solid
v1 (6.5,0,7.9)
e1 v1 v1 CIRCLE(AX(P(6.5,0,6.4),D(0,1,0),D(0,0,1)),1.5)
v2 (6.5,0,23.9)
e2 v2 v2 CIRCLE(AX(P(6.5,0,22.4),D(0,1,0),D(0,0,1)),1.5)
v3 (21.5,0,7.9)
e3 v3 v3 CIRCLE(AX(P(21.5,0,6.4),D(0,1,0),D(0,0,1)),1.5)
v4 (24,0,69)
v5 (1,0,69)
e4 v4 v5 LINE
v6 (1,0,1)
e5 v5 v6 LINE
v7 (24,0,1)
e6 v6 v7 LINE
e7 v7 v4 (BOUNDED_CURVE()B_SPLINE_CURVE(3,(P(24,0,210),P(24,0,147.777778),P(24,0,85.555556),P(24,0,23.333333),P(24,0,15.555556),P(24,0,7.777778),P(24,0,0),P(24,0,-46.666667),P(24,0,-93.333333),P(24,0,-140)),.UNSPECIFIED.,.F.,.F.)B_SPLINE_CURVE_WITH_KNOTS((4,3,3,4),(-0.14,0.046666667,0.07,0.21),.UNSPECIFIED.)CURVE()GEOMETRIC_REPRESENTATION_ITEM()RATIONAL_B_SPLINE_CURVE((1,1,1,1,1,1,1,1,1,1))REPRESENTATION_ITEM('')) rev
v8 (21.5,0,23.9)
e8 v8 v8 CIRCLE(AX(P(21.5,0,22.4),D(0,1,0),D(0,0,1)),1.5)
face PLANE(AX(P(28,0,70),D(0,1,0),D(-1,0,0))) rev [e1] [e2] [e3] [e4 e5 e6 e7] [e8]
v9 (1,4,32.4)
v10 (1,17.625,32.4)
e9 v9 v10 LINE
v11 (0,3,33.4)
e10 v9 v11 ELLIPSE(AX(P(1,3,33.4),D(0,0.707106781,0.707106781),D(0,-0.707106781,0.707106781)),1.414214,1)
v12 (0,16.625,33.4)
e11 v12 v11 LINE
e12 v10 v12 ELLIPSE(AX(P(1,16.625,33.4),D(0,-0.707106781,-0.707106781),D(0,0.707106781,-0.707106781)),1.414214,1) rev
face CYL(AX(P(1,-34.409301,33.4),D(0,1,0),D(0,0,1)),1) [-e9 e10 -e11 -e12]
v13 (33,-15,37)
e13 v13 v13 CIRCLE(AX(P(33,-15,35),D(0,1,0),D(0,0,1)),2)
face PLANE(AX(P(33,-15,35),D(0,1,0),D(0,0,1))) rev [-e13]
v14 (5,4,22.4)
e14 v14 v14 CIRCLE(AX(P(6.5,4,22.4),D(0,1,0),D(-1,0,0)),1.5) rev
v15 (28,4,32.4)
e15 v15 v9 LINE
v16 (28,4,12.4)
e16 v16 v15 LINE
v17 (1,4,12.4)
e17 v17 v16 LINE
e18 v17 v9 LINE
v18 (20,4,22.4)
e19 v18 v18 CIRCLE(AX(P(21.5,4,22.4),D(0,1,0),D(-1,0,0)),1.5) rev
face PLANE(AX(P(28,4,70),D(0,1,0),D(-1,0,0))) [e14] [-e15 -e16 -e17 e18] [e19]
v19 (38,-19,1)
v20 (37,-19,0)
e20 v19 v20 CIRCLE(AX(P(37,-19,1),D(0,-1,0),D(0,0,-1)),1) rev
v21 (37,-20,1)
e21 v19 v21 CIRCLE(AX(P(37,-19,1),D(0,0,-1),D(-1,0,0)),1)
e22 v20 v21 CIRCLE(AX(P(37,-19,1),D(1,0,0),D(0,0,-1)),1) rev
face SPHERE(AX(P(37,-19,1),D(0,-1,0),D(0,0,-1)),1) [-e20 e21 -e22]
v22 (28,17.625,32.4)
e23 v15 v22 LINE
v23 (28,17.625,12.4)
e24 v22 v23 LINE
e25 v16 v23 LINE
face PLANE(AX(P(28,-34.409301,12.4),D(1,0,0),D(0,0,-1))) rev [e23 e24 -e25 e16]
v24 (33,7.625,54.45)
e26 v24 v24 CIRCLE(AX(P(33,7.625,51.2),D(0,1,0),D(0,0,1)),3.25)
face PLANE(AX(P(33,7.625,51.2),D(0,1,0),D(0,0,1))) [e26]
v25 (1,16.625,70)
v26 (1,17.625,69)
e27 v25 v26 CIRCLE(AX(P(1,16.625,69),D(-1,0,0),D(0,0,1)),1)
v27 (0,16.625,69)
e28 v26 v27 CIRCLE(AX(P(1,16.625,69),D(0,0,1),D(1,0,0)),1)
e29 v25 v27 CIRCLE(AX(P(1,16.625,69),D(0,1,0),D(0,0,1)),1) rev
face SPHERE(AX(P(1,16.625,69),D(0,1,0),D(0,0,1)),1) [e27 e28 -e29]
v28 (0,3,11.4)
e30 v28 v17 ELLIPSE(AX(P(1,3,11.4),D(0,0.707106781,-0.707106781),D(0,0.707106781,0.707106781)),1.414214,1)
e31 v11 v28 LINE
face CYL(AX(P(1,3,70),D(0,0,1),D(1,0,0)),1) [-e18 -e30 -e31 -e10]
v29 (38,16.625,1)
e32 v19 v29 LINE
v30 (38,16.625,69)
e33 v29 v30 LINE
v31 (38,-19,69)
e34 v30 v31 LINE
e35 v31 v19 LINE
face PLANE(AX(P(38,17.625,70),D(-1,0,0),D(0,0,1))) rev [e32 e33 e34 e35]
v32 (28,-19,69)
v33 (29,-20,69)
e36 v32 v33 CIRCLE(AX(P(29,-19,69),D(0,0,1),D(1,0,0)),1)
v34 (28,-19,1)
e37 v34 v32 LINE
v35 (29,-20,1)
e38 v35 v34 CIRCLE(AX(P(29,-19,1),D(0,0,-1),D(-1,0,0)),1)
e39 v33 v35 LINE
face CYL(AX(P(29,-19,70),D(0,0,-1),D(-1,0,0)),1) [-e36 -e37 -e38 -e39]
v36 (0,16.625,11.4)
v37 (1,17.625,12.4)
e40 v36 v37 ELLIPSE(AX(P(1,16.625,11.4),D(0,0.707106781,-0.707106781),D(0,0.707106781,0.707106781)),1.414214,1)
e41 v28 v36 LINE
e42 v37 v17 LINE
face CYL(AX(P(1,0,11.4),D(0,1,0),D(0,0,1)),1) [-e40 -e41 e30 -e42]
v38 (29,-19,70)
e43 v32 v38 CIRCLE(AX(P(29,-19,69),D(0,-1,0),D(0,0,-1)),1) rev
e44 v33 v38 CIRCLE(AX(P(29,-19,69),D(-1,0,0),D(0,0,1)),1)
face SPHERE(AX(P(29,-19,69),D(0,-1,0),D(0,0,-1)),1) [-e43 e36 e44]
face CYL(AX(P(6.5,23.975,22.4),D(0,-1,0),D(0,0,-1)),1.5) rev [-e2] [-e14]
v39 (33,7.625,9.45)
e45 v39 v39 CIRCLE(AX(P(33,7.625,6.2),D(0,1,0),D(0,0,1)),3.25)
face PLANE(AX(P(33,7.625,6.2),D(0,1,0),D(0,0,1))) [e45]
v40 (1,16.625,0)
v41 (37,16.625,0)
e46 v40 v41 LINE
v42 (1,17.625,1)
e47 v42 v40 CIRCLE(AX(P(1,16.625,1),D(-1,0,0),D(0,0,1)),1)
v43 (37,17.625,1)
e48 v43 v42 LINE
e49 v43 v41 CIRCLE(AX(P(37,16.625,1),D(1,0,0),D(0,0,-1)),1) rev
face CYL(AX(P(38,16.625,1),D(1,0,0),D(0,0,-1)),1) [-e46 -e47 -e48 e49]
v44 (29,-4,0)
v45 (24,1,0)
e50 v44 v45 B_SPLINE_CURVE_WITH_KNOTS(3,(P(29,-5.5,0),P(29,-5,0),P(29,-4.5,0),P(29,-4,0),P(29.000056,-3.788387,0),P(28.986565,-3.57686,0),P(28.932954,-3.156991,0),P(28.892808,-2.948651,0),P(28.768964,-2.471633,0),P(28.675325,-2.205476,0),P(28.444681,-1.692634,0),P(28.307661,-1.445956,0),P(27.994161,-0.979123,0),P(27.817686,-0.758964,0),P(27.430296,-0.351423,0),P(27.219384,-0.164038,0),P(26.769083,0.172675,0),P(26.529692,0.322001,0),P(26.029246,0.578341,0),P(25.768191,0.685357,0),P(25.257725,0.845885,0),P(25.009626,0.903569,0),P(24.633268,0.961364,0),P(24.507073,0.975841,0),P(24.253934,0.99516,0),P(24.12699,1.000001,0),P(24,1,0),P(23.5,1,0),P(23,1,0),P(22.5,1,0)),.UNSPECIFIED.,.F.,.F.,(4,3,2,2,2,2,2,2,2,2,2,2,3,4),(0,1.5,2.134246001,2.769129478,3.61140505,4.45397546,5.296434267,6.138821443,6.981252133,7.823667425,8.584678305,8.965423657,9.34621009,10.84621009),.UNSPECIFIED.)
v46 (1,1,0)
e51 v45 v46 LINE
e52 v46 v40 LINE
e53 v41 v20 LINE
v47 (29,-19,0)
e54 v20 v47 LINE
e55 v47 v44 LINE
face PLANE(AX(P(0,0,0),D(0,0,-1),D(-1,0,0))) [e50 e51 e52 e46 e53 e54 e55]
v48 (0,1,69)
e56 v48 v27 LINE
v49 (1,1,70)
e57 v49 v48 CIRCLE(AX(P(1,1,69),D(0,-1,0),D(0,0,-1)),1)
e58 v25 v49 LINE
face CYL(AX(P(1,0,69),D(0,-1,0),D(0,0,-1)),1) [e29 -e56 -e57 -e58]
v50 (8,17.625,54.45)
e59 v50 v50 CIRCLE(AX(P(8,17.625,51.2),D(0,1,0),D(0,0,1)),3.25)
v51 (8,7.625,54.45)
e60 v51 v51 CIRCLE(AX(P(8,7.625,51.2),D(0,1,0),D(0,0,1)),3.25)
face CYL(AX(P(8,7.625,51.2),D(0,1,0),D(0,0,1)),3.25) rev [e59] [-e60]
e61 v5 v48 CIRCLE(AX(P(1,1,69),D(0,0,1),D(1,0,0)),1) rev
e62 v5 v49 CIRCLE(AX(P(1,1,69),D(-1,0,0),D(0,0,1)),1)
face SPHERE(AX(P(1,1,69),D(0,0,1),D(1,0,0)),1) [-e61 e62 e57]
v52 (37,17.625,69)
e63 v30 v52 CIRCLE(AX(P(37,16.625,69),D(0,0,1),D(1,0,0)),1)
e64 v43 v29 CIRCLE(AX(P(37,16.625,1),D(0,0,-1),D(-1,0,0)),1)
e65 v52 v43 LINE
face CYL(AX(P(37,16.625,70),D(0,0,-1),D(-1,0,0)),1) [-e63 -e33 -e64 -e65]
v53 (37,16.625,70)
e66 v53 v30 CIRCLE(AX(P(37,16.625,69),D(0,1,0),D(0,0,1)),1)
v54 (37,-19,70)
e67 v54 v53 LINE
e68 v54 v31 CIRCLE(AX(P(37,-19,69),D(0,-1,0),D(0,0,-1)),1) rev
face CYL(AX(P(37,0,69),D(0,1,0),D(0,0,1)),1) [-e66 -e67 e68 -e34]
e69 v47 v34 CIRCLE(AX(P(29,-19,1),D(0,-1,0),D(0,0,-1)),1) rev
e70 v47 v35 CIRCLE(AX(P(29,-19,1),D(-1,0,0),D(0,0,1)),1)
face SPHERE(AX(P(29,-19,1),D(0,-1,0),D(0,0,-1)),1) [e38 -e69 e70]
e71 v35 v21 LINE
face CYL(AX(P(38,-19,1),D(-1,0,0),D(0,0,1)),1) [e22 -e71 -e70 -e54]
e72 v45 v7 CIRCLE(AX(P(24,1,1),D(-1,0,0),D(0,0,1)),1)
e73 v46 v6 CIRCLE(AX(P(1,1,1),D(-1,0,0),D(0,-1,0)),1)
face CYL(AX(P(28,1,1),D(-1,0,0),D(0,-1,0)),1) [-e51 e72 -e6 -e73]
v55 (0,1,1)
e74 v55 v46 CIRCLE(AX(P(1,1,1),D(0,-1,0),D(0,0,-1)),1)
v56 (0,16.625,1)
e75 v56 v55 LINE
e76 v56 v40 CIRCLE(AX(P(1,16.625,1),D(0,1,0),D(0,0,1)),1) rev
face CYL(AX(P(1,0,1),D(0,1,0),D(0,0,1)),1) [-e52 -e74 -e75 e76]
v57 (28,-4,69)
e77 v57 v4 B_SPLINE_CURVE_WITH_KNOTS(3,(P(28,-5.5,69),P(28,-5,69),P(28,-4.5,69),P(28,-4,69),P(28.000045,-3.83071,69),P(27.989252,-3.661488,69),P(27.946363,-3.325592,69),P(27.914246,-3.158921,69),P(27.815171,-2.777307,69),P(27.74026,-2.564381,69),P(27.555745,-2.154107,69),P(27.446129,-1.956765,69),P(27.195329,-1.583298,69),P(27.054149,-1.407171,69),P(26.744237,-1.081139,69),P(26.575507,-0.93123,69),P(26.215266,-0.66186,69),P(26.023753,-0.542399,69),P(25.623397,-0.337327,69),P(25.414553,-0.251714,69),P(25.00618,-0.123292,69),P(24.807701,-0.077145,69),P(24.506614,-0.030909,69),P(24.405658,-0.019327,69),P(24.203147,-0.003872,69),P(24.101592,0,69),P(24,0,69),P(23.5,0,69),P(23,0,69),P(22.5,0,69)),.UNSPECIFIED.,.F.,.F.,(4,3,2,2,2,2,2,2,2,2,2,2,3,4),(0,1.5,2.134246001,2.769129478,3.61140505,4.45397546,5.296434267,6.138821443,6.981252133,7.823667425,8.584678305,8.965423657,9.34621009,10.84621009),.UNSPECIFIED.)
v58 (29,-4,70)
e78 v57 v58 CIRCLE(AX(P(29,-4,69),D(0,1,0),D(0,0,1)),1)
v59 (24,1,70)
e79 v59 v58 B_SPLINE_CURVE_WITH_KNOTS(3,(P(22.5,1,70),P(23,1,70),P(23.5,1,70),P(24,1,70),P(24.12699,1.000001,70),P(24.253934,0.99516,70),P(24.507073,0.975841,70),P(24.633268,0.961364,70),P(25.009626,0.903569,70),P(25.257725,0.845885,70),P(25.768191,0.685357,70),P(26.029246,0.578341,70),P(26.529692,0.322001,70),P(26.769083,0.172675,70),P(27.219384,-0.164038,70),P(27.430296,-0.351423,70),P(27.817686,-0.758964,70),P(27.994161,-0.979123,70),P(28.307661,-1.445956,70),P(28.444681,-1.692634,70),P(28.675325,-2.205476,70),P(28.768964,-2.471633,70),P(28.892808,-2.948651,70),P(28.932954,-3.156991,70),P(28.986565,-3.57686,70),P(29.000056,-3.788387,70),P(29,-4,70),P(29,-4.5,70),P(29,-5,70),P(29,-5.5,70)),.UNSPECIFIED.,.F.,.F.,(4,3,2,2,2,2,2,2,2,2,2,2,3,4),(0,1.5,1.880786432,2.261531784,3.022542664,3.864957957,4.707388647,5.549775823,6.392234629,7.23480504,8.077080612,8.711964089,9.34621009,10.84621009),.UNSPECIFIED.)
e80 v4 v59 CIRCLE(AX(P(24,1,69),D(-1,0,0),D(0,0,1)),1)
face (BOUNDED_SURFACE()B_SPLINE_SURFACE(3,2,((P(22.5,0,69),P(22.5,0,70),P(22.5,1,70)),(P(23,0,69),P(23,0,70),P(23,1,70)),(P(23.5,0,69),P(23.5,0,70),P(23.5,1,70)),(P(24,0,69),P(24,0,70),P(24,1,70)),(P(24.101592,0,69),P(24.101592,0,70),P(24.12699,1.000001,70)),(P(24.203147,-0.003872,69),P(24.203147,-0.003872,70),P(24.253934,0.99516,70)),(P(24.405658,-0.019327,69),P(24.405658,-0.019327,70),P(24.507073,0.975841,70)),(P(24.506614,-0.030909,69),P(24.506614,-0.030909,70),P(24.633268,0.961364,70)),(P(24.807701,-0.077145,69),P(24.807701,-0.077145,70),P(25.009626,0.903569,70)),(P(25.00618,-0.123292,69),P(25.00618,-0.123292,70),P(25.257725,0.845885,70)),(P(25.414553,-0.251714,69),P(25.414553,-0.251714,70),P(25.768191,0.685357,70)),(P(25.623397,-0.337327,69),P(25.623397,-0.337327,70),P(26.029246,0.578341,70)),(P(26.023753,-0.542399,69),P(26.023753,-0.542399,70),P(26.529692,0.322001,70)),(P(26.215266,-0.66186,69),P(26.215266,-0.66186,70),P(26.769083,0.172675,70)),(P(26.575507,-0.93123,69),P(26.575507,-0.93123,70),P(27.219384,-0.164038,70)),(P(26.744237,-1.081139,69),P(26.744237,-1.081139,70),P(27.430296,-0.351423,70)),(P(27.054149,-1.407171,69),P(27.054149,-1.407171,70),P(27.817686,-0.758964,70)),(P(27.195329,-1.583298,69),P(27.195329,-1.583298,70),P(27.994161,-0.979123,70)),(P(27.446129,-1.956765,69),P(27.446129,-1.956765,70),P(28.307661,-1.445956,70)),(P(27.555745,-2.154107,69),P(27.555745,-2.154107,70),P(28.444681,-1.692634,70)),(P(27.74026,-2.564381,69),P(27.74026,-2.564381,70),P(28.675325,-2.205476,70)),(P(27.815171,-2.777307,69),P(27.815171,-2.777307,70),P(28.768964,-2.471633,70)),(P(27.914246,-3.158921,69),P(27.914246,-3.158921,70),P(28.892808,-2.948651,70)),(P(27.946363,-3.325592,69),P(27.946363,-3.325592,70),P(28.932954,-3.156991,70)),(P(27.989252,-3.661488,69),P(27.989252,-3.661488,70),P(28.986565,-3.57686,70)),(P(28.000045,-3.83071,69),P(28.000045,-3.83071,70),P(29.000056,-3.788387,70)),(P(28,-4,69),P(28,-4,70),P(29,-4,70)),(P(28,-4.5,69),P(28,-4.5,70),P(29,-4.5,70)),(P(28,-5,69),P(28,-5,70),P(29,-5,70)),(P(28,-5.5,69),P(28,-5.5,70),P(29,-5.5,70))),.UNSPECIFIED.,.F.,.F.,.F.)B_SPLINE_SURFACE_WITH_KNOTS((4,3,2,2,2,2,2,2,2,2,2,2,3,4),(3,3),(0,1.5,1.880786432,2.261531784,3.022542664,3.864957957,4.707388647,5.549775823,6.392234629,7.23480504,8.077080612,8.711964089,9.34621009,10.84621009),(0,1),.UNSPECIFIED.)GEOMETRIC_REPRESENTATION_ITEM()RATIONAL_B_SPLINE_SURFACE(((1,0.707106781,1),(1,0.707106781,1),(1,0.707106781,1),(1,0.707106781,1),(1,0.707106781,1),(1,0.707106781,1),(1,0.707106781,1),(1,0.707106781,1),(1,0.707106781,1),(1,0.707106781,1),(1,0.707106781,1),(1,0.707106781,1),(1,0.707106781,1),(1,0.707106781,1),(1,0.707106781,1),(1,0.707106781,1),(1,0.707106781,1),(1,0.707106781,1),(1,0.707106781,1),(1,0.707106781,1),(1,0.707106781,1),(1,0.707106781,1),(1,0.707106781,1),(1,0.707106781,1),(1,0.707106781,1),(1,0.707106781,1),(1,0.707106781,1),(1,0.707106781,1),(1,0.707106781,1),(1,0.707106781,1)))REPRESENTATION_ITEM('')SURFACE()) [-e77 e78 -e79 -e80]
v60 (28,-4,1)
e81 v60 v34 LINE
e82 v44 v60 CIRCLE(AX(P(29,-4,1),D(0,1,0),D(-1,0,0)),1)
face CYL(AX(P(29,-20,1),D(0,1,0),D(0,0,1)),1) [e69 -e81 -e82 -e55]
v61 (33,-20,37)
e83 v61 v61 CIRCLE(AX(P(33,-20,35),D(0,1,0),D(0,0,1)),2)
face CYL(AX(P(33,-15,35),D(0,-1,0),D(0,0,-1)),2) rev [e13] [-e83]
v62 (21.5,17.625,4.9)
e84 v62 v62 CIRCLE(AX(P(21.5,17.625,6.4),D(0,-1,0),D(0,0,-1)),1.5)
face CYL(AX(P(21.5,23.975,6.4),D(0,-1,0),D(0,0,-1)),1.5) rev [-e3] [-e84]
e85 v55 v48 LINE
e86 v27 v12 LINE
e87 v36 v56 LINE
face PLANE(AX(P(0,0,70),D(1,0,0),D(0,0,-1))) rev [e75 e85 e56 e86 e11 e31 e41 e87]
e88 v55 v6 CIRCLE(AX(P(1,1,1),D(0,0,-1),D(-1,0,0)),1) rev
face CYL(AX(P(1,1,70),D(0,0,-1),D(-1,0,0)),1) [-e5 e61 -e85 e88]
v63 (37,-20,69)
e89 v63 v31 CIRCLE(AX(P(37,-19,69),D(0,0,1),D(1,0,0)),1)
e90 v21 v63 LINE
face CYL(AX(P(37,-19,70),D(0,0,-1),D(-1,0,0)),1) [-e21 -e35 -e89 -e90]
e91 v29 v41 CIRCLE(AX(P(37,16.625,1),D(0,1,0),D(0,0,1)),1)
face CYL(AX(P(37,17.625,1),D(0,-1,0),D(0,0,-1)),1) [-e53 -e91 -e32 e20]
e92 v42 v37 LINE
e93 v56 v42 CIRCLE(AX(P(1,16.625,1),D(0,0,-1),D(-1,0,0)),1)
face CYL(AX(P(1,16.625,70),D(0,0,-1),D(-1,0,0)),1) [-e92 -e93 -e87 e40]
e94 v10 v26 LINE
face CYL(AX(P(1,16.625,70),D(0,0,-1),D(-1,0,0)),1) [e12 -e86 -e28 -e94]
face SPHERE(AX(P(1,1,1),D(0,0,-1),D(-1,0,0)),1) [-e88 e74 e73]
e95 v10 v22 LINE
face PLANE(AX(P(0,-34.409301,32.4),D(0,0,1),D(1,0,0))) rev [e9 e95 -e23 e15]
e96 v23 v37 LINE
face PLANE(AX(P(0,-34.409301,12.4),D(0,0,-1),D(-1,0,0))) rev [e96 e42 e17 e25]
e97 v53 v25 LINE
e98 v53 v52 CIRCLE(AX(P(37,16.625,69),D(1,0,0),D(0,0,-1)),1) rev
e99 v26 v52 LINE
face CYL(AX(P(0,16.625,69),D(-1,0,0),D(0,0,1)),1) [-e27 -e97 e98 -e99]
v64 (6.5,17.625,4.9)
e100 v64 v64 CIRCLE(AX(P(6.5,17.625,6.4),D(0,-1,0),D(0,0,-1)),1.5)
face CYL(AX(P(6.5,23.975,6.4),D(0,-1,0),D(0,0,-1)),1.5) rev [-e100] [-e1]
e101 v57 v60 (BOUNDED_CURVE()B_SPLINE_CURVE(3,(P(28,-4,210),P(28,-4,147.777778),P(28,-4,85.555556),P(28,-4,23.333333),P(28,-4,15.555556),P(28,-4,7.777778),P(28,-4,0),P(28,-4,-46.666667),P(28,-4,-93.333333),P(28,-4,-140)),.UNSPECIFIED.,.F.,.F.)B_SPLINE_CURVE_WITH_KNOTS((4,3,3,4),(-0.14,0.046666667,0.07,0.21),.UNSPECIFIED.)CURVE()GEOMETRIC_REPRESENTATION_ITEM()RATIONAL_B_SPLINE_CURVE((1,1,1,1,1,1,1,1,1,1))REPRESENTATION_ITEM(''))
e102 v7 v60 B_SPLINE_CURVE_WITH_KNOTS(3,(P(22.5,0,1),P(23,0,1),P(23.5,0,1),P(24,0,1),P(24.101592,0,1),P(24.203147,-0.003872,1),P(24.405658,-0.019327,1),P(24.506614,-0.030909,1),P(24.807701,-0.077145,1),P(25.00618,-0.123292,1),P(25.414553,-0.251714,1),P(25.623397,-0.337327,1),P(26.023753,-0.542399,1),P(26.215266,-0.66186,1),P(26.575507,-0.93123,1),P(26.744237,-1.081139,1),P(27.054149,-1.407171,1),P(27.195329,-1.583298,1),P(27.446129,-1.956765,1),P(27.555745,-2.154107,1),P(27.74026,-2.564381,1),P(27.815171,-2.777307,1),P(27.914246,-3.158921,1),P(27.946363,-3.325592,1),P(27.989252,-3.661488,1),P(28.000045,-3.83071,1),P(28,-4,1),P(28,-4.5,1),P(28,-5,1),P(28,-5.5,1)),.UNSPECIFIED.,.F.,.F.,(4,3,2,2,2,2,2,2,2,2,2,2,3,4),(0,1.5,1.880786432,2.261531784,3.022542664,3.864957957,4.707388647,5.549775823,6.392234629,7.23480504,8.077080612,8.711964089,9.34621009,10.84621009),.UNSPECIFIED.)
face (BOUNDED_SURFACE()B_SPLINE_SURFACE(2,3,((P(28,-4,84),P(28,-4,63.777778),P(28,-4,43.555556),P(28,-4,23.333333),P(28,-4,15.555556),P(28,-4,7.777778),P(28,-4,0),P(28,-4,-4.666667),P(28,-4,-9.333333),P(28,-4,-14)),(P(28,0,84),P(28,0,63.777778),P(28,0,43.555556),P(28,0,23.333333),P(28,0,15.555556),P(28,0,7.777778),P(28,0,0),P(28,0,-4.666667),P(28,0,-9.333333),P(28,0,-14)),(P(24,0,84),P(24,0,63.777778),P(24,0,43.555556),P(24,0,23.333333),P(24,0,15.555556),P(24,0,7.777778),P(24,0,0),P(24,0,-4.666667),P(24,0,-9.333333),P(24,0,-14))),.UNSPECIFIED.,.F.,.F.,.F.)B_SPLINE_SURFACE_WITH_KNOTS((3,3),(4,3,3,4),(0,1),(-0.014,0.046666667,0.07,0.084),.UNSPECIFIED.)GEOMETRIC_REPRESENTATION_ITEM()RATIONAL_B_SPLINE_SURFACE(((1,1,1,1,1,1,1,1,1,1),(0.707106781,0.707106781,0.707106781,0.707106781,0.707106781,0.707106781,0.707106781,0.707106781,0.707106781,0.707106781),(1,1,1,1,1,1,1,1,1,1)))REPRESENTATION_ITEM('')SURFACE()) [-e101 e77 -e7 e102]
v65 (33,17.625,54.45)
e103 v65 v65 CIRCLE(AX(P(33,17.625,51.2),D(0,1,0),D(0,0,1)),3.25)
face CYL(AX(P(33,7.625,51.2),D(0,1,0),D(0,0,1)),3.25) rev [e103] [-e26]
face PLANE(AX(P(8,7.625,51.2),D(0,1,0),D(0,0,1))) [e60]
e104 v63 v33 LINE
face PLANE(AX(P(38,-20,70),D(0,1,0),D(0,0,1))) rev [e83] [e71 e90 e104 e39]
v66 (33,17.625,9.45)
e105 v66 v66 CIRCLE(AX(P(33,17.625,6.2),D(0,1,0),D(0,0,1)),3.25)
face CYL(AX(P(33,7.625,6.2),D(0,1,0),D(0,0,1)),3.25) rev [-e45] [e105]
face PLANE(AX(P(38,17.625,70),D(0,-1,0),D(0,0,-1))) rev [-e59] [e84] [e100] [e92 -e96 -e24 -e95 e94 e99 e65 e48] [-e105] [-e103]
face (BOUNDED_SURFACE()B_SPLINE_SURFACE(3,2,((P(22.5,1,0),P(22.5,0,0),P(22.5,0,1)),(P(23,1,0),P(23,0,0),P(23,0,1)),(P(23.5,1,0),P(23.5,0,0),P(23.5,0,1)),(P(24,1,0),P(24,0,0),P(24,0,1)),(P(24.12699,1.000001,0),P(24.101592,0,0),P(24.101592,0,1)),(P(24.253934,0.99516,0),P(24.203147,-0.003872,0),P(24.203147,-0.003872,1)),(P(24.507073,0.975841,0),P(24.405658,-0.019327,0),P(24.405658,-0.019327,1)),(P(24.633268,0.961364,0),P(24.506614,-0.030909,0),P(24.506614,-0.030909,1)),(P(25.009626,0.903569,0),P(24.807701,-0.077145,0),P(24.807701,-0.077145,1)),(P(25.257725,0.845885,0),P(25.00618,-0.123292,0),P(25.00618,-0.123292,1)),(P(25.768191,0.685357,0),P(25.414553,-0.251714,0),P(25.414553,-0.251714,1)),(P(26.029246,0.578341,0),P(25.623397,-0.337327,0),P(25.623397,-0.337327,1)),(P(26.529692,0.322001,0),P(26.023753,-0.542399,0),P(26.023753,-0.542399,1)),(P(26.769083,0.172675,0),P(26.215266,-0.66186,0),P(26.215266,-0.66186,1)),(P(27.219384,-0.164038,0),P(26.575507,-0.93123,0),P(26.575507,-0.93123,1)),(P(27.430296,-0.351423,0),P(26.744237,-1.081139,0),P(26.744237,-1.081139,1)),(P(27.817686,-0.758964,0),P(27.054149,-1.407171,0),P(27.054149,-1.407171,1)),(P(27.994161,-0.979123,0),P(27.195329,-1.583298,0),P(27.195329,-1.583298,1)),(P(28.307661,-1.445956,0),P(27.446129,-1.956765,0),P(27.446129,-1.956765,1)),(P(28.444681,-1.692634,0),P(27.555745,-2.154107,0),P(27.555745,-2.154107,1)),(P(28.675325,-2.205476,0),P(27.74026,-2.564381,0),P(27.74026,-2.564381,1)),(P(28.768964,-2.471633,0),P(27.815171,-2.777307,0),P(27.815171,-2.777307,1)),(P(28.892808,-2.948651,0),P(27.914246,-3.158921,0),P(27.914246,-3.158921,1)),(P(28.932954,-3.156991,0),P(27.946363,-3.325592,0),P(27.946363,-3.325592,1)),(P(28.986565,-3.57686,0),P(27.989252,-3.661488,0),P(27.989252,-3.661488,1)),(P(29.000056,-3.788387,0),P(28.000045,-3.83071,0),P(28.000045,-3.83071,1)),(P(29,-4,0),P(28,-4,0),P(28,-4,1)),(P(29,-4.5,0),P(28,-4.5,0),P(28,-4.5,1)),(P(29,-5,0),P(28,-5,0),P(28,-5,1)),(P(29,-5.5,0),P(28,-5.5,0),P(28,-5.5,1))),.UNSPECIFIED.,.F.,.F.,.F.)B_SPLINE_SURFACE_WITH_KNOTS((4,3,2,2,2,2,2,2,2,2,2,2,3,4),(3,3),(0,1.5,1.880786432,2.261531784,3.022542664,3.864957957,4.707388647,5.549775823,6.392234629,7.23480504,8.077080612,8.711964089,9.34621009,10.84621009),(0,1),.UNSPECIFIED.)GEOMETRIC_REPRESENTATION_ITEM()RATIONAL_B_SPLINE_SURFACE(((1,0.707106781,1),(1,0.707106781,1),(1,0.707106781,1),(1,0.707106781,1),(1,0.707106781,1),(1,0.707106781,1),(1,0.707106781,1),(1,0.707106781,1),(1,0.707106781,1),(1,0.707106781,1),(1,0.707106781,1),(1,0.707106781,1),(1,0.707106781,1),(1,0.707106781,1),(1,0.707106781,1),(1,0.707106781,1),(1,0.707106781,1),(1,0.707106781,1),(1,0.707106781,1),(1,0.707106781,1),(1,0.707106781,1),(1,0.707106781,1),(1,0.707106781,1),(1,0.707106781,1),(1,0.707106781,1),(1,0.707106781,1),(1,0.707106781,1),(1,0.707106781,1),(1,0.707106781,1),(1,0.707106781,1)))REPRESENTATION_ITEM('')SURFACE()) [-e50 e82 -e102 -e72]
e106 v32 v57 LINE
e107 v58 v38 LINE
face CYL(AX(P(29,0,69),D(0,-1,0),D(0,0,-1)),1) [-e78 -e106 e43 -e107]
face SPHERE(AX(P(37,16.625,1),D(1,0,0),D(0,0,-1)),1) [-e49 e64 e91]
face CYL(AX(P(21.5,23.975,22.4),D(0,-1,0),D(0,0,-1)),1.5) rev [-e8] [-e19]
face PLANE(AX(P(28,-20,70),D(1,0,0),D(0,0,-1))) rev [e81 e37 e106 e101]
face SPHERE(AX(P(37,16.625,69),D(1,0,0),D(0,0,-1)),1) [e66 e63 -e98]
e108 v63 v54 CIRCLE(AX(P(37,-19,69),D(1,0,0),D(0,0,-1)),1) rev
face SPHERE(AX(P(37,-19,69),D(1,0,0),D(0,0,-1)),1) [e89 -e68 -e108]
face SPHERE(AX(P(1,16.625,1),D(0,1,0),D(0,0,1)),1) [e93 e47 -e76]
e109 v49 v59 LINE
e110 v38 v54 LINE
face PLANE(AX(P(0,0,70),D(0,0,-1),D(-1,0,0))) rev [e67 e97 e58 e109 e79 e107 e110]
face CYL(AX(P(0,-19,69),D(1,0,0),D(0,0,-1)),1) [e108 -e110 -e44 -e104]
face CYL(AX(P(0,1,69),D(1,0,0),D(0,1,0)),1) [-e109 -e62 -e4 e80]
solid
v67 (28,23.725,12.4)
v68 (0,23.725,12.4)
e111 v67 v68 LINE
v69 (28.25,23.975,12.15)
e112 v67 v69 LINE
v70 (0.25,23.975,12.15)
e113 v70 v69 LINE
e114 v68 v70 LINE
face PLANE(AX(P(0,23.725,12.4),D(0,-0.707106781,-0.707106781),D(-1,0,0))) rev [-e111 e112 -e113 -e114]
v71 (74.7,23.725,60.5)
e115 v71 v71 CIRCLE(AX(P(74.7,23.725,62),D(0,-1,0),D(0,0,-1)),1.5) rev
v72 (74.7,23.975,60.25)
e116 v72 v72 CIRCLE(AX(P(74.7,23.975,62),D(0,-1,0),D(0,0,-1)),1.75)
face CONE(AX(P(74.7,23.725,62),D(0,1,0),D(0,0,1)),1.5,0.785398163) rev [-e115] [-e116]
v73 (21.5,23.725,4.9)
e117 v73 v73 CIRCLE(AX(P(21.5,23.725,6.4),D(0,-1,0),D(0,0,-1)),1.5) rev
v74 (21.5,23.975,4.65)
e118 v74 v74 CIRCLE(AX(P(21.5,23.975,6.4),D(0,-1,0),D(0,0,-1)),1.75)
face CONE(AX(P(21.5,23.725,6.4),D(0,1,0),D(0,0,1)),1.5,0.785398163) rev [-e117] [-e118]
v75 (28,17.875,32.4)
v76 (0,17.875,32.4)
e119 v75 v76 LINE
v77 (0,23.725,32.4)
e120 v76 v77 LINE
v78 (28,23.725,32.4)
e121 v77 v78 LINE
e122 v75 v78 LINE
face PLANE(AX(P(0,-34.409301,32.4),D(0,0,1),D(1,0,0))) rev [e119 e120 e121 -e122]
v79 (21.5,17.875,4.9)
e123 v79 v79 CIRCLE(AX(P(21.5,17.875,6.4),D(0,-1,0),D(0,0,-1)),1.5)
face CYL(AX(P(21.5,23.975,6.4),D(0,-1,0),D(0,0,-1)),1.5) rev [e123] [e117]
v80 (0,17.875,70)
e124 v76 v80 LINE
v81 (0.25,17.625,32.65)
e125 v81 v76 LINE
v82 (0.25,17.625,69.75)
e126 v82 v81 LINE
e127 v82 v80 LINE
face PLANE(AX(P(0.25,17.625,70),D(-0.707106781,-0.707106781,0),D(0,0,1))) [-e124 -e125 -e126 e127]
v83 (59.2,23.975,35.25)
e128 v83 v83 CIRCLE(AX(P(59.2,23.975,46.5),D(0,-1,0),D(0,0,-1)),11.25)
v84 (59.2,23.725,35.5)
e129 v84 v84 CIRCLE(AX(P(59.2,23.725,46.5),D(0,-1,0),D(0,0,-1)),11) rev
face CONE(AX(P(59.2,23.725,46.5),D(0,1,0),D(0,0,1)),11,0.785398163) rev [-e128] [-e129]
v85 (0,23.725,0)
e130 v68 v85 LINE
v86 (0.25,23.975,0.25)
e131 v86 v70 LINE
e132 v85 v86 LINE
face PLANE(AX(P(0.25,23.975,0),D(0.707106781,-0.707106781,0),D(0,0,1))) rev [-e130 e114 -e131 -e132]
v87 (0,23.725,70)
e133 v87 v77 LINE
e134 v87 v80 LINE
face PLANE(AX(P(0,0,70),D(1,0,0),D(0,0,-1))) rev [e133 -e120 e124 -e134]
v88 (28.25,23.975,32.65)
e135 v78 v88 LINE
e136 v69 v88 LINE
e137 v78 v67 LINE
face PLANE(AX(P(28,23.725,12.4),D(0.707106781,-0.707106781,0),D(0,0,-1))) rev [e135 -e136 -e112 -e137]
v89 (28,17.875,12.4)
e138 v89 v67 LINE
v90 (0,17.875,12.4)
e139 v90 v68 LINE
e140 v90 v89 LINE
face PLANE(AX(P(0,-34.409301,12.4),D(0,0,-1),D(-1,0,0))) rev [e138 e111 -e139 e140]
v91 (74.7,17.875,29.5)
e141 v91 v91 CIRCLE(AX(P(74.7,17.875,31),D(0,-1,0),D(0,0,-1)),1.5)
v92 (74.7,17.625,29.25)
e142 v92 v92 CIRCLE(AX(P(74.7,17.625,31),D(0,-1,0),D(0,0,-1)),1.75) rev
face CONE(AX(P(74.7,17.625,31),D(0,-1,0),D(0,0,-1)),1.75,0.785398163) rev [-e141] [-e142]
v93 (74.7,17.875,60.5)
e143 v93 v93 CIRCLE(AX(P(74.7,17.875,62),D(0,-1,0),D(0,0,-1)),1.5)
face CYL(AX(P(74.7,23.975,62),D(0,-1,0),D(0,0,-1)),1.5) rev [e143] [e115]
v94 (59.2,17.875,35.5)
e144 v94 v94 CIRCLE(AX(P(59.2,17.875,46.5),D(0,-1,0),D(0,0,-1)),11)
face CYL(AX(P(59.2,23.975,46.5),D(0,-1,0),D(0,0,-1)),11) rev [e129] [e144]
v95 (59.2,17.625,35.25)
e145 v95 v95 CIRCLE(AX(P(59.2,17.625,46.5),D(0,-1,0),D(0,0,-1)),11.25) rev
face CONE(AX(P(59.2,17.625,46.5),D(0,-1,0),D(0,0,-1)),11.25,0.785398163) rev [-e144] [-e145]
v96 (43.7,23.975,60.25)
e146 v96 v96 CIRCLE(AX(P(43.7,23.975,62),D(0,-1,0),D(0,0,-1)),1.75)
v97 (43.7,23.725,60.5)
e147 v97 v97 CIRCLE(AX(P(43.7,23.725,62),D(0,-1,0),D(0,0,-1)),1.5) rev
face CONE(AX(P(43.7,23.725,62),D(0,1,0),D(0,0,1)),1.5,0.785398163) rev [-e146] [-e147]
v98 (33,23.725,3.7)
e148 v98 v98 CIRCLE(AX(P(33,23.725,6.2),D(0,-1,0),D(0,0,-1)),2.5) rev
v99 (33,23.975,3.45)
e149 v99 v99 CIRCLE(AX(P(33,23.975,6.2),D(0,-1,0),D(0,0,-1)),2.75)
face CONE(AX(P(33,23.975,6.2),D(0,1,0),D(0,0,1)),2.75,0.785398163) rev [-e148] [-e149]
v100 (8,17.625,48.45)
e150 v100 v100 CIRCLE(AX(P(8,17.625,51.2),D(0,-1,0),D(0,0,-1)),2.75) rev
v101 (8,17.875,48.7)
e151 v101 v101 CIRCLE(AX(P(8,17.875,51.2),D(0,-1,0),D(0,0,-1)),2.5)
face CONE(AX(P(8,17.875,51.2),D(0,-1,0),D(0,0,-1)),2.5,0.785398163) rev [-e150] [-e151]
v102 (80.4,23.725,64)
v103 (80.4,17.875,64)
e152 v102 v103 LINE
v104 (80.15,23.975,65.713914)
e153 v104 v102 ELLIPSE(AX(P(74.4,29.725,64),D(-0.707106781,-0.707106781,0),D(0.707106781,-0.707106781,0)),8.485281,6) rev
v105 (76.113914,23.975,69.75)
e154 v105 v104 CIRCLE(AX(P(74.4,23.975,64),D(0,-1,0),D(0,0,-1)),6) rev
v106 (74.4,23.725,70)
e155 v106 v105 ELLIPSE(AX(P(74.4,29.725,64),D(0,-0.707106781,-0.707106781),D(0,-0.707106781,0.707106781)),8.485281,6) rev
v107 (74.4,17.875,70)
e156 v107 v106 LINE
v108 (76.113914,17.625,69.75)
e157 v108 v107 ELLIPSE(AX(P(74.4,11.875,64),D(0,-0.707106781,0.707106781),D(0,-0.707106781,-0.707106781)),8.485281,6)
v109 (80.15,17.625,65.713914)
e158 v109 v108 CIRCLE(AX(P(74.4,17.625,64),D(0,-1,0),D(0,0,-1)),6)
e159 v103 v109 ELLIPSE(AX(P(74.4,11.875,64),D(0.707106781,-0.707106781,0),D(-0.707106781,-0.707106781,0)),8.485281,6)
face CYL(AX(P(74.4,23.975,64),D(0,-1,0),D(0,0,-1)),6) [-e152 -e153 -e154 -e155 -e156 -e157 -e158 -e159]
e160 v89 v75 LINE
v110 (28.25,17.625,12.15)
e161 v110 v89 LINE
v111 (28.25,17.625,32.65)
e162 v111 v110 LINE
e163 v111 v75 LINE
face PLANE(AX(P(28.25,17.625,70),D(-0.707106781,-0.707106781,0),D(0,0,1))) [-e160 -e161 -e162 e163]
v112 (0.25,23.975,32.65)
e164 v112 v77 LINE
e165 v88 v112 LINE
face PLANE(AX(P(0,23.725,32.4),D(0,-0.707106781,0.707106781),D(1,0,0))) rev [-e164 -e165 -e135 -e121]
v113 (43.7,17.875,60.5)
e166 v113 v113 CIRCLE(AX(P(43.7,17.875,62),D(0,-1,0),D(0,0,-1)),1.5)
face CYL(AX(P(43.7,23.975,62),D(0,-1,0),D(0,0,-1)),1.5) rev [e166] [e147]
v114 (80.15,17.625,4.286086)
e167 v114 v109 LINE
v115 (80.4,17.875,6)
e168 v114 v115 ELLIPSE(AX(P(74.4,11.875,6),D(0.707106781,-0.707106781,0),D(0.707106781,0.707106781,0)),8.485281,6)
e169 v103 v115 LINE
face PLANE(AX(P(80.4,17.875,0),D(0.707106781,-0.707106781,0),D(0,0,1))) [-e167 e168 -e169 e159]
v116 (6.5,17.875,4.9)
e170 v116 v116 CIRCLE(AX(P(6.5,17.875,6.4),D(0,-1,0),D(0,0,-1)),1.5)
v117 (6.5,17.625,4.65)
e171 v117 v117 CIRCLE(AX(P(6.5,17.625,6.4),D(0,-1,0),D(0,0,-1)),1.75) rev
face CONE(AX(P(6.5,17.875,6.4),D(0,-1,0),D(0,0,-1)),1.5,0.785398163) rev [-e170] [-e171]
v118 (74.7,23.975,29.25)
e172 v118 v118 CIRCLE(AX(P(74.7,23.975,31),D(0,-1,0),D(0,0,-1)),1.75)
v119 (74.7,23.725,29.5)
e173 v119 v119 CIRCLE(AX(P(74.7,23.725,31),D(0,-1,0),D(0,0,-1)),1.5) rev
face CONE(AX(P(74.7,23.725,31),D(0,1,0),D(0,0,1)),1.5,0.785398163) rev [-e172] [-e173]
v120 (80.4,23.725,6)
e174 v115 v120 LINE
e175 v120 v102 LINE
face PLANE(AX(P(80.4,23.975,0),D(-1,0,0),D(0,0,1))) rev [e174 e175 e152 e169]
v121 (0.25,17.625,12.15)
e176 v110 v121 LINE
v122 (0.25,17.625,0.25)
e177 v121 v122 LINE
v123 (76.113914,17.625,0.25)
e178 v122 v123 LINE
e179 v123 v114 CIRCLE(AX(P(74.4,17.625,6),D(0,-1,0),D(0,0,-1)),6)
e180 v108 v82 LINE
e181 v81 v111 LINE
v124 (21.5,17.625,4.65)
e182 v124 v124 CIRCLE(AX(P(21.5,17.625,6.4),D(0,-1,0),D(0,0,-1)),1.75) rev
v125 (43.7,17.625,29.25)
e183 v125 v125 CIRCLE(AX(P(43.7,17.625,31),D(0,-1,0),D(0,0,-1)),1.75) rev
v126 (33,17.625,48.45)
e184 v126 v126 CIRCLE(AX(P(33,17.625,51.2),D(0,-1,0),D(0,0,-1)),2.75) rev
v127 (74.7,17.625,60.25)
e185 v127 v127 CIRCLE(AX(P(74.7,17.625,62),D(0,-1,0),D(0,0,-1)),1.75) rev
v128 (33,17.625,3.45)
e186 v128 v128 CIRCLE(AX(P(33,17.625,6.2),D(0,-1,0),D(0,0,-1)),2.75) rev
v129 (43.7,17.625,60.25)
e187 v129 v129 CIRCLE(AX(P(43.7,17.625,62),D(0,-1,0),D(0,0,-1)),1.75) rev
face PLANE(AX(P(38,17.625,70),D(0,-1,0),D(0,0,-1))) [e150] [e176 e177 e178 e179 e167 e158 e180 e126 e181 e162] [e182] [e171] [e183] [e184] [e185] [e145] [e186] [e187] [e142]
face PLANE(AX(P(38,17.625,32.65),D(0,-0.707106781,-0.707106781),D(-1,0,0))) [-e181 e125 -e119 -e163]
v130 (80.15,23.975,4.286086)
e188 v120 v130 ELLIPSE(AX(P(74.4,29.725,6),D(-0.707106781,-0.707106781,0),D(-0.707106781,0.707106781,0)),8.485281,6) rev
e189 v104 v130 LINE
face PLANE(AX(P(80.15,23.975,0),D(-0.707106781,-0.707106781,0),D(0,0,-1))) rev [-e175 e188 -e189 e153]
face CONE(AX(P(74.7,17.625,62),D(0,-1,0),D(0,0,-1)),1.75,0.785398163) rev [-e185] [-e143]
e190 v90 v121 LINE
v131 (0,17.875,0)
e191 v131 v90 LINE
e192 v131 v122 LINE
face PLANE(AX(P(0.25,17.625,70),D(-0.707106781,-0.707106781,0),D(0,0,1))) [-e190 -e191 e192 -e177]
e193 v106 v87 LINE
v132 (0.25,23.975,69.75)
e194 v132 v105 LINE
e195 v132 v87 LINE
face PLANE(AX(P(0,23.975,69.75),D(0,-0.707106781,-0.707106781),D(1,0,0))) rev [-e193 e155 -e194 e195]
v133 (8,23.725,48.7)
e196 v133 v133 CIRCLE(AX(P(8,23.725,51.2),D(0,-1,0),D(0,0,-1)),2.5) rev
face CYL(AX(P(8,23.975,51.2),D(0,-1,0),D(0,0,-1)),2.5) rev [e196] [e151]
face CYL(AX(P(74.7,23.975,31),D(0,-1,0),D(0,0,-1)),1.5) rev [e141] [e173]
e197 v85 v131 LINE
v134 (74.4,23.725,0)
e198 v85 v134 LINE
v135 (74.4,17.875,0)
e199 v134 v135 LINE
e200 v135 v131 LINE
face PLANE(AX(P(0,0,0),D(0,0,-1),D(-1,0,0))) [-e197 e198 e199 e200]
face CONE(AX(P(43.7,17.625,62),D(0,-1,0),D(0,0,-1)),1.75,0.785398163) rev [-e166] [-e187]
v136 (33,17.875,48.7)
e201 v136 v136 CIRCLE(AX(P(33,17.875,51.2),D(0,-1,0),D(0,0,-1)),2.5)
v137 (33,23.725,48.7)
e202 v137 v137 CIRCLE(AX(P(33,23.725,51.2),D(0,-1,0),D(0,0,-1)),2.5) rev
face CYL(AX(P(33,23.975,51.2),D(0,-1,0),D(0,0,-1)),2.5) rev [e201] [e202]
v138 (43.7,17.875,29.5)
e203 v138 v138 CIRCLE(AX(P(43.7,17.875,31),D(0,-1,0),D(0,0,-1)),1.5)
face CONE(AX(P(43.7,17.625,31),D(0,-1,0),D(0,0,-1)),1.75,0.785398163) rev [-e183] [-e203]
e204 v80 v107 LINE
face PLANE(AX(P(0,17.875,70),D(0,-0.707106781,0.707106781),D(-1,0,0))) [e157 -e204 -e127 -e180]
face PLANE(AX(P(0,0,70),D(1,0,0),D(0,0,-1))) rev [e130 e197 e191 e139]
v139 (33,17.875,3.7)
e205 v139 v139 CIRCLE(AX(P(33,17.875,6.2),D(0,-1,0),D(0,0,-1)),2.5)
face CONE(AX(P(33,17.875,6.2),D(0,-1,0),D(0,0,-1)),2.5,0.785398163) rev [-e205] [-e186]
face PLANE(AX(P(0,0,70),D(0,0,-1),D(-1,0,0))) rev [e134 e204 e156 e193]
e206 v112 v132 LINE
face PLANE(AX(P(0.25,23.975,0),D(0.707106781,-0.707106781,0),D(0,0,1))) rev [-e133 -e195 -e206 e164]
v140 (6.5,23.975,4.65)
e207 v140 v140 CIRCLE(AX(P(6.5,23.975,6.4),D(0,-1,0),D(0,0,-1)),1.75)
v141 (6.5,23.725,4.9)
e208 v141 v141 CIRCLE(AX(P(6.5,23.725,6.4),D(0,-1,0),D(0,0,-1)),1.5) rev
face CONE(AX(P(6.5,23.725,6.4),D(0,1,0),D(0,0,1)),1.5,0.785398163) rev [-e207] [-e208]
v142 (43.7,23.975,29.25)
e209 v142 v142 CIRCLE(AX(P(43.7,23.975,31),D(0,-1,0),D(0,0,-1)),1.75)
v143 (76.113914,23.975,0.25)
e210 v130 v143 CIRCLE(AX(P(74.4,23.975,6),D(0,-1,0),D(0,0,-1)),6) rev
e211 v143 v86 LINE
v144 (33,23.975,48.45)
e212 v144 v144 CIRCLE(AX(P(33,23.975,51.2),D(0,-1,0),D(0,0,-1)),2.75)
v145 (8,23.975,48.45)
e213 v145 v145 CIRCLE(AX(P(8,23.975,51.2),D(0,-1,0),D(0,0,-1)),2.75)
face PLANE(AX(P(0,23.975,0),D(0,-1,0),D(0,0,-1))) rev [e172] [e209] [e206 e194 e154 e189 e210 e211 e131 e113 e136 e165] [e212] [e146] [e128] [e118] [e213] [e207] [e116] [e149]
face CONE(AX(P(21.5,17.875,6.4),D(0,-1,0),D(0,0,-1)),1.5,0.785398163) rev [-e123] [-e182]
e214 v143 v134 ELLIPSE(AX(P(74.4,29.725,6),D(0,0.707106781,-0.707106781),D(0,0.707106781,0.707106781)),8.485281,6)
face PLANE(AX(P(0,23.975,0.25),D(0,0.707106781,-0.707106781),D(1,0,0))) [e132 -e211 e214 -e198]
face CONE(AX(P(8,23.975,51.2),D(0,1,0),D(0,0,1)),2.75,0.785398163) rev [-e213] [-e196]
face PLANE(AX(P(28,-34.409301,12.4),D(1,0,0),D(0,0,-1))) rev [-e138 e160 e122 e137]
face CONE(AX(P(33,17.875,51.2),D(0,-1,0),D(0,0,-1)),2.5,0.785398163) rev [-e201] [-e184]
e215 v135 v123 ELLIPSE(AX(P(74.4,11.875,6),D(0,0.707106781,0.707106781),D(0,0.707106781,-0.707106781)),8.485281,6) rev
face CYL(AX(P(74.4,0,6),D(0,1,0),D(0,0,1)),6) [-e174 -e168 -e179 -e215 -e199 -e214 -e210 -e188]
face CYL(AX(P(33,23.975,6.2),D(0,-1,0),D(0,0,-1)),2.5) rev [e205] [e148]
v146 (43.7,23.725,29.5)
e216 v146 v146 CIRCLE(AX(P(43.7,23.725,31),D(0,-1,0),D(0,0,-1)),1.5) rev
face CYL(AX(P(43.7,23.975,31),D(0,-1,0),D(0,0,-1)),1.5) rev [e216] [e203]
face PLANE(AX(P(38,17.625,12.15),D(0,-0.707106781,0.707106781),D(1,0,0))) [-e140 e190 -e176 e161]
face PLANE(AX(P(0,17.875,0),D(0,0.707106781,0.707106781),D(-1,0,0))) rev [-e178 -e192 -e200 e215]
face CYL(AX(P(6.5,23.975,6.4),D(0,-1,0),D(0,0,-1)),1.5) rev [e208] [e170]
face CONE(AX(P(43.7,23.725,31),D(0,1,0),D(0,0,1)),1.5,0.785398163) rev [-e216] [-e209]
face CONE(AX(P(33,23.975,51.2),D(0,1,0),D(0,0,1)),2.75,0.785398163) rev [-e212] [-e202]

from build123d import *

# Parameters (mm, degrees)
BOSS_EXTRUDE1_DEPTH = 70
SKETCH4_R           = 1.5
SKETCH4_R_2         = 11
BOSS_EXTRUDE3_DEPTH = 6.35
SKETCH5_W           = 28
SKETCH5_H           = 20
CUT_EXTRUDE2_DEPTH  = 19.975
SKETCH2_R           = 1.5
CUT_EXTRUDE1_DEPTH  = 110.265550953
VARFILLET1_DEPTH    = 70
SKETCH7_R           = 3.25
CUT_EXTRUDE4_DEPTH  = 10
SKETCH8_R           = 2.5
CUT_EXTRUDE5_DEPTH  = 114.04778037
SKETCH18_R          = 2
CUT_EXTRUDE9_DEPTH  = 5
CHAMFER1_SIZE       = 0.25
FILLET1_R           = 1
FILLET2_R           = 6


with BuildPart() as part:
    # Sketch1 → Boss-Extrude1 (new body)
    with BuildSketch(Plane.XY):
        Polygon((0, 0), (0, 17.625), (38, 17.625), (38, -20), (28, -20), (28, 0), align=None)
    extrude(amount=BOSS_EXTRUDE1_DEPTH)

    # Sketch4 → Boss-Extrude3 (add)
    with BuildSketch(Plane(origin=(0, 17.625, 0), x_dir=(1, 0, 0), z_dir=(0, 1, 0))):
        Polygon((38, -70), (0, -70), (0, 0), (38, 0), (80.4, 0), (80.4, -70), align=None)
        with Locations(Location((43.7, -31, 0), (0, 0, 270))):
            Circle(SKETCH4_R, mode=Mode.SUBTRACT)
        with Locations(Location((43.7, -62, 0), (0, 0, 270))):
            Circle(SKETCH4_R, mode=Mode.SUBTRACT)
        with Locations(Location((74.7, -62, 0), (0, 0, 270))):
            Circle(SKETCH4_R, mode=Mode.SUBTRACT)
        with Locations(Location((74.7, -31, 0), (0, 0, 270))):
            Circle(SKETCH4_R, mode=Mode.SUBTRACT)
        with Locations(Location((59.2, -46.5, 0), (0, 0, 270))):
            Circle(SKETCH4_R_2, mode=Mode.SUBTRACT)
    extrude(amount=BOSS_EXTRUDE3_DEPTH)

    # Sketch5 → Cut-Extrude2 (cut)
    with BuildSketch(Plane(origin=(0, 23.975, 0), x_dir=(1, 0, 0), z_dir=(0, 1, 0))):
        with Locations((14, -22.4)):
            Rectangle(SKETCH5_W, SKETCH5_H)
    extrude(amount=-CUT_EXTRUDE2_DEPTH, mode=Mode.SUBTRACT)

    # Sketch2 → Cut-Extrude1 (cut, through all)
    with BuildSketch(Plane(origin=(0, 0, 0), x_dir=(1, 0, 0), z_dir=(0, 1, 0))):
        with Locations(Location((6.5, -6.4, 0), (0, 0, 270))):
            Circle(SKETCH2_R)
        with Locations(Location((6.5, -22.4, 0), (0, 0, 180))):
            Circle(SKETCH2_R)
        with Locations(Location((21.5, -22.4, 0), (0, 0, 180))):
            Circle(SKETCH2_R)
        with Locations(Location((21.5, -6.4, 0), (0, 0, 270))):
            Circle(SKETCH2_R)
    extrude(amount=CUT_EXTRUDE1_DEPTH, mode=Mode.SUBTRACT)

    # VarFillet1: read off the stored shape, not the designer's step
    # VarFillet1 outline → VarFillet1 (add)
    with BuildSketch(Plane.XY):
        with BuildLine():
            add(Edge.make_bspline(
                [(28, -4), (28, 0), (24, 0)],
                knots=[0, 0, 0, 1, 1, 1], degree=2, weights=[1, 0.707106781, 1]))
            Line((28, -4), (28, 0))
            Line((28, 0), (24, 0))
        make_face()
    extrude(amount=VARFILLET1_DEPTH)


with BuildPart() as body_2:
    # Split1: read off the stored shape, not the designer's step
    # Split1: the piece on the far side of the plane
    add(part.part)
    split(bisect_by=Plane(origin=(0, 17.625, 0), x_dir=(1, 0, 0), z_dir=(0, 1, 0)), keep=Keep.BOTTOM)

    # Sketch7 → Cut-Extrude4 (cut)
    with BuildSketch(Plane(origin=(0, 17.625, 0), x_dir=(1, 0, 0), z_dir=(0, 1, 0))):
        with Locations(Location((33, -6.2, 0), (0, 0, 270))):
            Circle(SKETCH7_R)
        with Locations(Location((33, -51.2, 0), (0, 0, 270))):
            Circle(SKETCH7_R)
        with Locations(Location((8, -51.2, 0), (0, 0, 270))):
            Circle(SKETCH7_R)
    extrude(amount=-CUT_EXTRUDE4_DEPTH, mode=Mode.SUBTRACT)

    # Sketch18 → Cut-Extrude9 (cut)
    with BuildSketch(Plane(origin=(52, -20, 0), x_dir=(0, 0, 1), z_dir=(0, 1, 0))):
        with Locations((35, -19)):
            Circle(SKETCH18_R)
    extrude(amount=CUT_EXTRUDE9_DEPTH, mode=Mode.SUBTRACT)

    # Fillet1
    fillet1_edges = [body_2.edges().sort_by_distance(p)[0] for p in [
        (0, 8.8125, 0),
        (0, 8.8125, 70),
        (19, 17.625, 70),
        (0, 17.625, 6.2),
        (0, 17.625, 51.2),
        (0, 0, 35),
        (38, -20, 35),
        (28, -20, 35),
        (19, 17.625, 0),
        (38, 17.625, 35),
        (33, -20, 70),
        (38, -1.1875, 70),
        (0, 10.8125, 32.4),
        (0, 10.8125, 12.4),
        (0, 4, 22.4),
        (12, 0, 70),
        (38, -1.1875, 0),
        (28, -12, 0),
        (28, -12, 70),
        (28, -4, 35),
        (24, 0, 35),
        (26.828426796, -1.171572546, 0),
        (33, -20, 0),
        (26.828426796, -1.171572546, 70),
        (12, 0, 0),
    ]]
    fillet(fillet1_edges, radius=FILLET1_R)


with BuildPart() as part_1:
    add(part.part)

    # Split1
    split(bisect_by=Plane(origin=(0, 17.625, 0), x_dir=(1, 0, 0), z_dir=(0, 1, 0)), keep=Keep.TOP)

    # Sketch8 → Cut-Extrude5 (cut, through all)
    with BuildSketch(Plane.XZ.offset(-17.625)):
        with Locations(Location((8, 51.2, 0), (0, 0, 270))):
            Circle(SKETCH8_R)
        with Locations(Location((33, 51.2, 0), (0, 0, 270))):
            Circle(SKETCH8_R)
        with Locations(Location((33, 6.2, 0), (0, 0, 270))):
            Circle(SKETCH8_R)
    extrude(amount=-CUT_EXTRUDE5_DEPTH, mode=Mode.SUBTRACT)

    # Chamfer1
    chamfer1_edges = [part_1.edges().sort_by_distance(p)[0] for p in [
        (21.5, 23.975, 4.9),
        (6.5, 23.975, 4.9),
        (14, 23.975, 32.4),
        (28, 23.975, 22.4),
        (14, 23.975, 12.4),
        (59.2, 17.625, 35.5),
        (59.2, 23.975, 35.5),
        (43.7, 17.625, 29.5),
        (43.7, 23.975, 29.5),
        (74.7, 17.625, 29.5),
        (74.7, 23.975, 29.5),
        (74.7, 17.625, 60.5),
        (74.7, 23.975, 60.5),
        (43.7, 17.625, 60.5),
        (43.7, 23.975, 60.5),
        (40.2, 17.625, 70),
        (80.4, 17.625, 35),
        (40.2, 17.625, 0),
        (0, 23.975, 51.2),
        (0, 23.975, 6.2),
        (40.2, 23.975, 70),
        (80.4, 23.975, 35),
        (40.2, 23.975, 0),
        (21.5, 17.625, 4.9),
        (6.5, 17.625, 4.9),
        (0, 17.625, 51.2),
        (0, 17.625, 6.2),
        (14, 17.625, 12.4),
        (28, 17.625, 22.4),
        (14, 17.625, 32.4),
        (8, 23.975, 53.7),
        (8, 17.625, 53.7),
        (33, 23.975, 53.7),
        (33, 17.625, 53.7),
        (33, 23.975, 8.7),
        (33, 17.625, 8.7),
    ]]
    chamfer(chamfer1_edges, length=CHAMFER1_SIZE)

    # Fillet2
    # the kernel refuses this fillet: 6 mm, written as the material it takes off along each edge
    with BuildSketch(Plane(origin=(80.4, 2.875, 70), x_dir=(0, 0, -1), z_dir=(0, 1, 0)), Plane(origin=(80.4, 2.875, 0), x_dir=(-1, 0, 0), z_dir=(0, 1, 0))) as fillet2_piece_1:
        with BuildLine():
            CenterArc((FILLET2_R, FILLET2_R), FILLET2_R, 180, 90)
            Line((0, FILLET2_R), (0, 0))
            Line((0, 0), (FILLET2_R, 0))
        make_face()
    extrude(amount=35.85, mode=Mode.SUBTRACT)


solid = Compound([body_2.part, part_1.part])
